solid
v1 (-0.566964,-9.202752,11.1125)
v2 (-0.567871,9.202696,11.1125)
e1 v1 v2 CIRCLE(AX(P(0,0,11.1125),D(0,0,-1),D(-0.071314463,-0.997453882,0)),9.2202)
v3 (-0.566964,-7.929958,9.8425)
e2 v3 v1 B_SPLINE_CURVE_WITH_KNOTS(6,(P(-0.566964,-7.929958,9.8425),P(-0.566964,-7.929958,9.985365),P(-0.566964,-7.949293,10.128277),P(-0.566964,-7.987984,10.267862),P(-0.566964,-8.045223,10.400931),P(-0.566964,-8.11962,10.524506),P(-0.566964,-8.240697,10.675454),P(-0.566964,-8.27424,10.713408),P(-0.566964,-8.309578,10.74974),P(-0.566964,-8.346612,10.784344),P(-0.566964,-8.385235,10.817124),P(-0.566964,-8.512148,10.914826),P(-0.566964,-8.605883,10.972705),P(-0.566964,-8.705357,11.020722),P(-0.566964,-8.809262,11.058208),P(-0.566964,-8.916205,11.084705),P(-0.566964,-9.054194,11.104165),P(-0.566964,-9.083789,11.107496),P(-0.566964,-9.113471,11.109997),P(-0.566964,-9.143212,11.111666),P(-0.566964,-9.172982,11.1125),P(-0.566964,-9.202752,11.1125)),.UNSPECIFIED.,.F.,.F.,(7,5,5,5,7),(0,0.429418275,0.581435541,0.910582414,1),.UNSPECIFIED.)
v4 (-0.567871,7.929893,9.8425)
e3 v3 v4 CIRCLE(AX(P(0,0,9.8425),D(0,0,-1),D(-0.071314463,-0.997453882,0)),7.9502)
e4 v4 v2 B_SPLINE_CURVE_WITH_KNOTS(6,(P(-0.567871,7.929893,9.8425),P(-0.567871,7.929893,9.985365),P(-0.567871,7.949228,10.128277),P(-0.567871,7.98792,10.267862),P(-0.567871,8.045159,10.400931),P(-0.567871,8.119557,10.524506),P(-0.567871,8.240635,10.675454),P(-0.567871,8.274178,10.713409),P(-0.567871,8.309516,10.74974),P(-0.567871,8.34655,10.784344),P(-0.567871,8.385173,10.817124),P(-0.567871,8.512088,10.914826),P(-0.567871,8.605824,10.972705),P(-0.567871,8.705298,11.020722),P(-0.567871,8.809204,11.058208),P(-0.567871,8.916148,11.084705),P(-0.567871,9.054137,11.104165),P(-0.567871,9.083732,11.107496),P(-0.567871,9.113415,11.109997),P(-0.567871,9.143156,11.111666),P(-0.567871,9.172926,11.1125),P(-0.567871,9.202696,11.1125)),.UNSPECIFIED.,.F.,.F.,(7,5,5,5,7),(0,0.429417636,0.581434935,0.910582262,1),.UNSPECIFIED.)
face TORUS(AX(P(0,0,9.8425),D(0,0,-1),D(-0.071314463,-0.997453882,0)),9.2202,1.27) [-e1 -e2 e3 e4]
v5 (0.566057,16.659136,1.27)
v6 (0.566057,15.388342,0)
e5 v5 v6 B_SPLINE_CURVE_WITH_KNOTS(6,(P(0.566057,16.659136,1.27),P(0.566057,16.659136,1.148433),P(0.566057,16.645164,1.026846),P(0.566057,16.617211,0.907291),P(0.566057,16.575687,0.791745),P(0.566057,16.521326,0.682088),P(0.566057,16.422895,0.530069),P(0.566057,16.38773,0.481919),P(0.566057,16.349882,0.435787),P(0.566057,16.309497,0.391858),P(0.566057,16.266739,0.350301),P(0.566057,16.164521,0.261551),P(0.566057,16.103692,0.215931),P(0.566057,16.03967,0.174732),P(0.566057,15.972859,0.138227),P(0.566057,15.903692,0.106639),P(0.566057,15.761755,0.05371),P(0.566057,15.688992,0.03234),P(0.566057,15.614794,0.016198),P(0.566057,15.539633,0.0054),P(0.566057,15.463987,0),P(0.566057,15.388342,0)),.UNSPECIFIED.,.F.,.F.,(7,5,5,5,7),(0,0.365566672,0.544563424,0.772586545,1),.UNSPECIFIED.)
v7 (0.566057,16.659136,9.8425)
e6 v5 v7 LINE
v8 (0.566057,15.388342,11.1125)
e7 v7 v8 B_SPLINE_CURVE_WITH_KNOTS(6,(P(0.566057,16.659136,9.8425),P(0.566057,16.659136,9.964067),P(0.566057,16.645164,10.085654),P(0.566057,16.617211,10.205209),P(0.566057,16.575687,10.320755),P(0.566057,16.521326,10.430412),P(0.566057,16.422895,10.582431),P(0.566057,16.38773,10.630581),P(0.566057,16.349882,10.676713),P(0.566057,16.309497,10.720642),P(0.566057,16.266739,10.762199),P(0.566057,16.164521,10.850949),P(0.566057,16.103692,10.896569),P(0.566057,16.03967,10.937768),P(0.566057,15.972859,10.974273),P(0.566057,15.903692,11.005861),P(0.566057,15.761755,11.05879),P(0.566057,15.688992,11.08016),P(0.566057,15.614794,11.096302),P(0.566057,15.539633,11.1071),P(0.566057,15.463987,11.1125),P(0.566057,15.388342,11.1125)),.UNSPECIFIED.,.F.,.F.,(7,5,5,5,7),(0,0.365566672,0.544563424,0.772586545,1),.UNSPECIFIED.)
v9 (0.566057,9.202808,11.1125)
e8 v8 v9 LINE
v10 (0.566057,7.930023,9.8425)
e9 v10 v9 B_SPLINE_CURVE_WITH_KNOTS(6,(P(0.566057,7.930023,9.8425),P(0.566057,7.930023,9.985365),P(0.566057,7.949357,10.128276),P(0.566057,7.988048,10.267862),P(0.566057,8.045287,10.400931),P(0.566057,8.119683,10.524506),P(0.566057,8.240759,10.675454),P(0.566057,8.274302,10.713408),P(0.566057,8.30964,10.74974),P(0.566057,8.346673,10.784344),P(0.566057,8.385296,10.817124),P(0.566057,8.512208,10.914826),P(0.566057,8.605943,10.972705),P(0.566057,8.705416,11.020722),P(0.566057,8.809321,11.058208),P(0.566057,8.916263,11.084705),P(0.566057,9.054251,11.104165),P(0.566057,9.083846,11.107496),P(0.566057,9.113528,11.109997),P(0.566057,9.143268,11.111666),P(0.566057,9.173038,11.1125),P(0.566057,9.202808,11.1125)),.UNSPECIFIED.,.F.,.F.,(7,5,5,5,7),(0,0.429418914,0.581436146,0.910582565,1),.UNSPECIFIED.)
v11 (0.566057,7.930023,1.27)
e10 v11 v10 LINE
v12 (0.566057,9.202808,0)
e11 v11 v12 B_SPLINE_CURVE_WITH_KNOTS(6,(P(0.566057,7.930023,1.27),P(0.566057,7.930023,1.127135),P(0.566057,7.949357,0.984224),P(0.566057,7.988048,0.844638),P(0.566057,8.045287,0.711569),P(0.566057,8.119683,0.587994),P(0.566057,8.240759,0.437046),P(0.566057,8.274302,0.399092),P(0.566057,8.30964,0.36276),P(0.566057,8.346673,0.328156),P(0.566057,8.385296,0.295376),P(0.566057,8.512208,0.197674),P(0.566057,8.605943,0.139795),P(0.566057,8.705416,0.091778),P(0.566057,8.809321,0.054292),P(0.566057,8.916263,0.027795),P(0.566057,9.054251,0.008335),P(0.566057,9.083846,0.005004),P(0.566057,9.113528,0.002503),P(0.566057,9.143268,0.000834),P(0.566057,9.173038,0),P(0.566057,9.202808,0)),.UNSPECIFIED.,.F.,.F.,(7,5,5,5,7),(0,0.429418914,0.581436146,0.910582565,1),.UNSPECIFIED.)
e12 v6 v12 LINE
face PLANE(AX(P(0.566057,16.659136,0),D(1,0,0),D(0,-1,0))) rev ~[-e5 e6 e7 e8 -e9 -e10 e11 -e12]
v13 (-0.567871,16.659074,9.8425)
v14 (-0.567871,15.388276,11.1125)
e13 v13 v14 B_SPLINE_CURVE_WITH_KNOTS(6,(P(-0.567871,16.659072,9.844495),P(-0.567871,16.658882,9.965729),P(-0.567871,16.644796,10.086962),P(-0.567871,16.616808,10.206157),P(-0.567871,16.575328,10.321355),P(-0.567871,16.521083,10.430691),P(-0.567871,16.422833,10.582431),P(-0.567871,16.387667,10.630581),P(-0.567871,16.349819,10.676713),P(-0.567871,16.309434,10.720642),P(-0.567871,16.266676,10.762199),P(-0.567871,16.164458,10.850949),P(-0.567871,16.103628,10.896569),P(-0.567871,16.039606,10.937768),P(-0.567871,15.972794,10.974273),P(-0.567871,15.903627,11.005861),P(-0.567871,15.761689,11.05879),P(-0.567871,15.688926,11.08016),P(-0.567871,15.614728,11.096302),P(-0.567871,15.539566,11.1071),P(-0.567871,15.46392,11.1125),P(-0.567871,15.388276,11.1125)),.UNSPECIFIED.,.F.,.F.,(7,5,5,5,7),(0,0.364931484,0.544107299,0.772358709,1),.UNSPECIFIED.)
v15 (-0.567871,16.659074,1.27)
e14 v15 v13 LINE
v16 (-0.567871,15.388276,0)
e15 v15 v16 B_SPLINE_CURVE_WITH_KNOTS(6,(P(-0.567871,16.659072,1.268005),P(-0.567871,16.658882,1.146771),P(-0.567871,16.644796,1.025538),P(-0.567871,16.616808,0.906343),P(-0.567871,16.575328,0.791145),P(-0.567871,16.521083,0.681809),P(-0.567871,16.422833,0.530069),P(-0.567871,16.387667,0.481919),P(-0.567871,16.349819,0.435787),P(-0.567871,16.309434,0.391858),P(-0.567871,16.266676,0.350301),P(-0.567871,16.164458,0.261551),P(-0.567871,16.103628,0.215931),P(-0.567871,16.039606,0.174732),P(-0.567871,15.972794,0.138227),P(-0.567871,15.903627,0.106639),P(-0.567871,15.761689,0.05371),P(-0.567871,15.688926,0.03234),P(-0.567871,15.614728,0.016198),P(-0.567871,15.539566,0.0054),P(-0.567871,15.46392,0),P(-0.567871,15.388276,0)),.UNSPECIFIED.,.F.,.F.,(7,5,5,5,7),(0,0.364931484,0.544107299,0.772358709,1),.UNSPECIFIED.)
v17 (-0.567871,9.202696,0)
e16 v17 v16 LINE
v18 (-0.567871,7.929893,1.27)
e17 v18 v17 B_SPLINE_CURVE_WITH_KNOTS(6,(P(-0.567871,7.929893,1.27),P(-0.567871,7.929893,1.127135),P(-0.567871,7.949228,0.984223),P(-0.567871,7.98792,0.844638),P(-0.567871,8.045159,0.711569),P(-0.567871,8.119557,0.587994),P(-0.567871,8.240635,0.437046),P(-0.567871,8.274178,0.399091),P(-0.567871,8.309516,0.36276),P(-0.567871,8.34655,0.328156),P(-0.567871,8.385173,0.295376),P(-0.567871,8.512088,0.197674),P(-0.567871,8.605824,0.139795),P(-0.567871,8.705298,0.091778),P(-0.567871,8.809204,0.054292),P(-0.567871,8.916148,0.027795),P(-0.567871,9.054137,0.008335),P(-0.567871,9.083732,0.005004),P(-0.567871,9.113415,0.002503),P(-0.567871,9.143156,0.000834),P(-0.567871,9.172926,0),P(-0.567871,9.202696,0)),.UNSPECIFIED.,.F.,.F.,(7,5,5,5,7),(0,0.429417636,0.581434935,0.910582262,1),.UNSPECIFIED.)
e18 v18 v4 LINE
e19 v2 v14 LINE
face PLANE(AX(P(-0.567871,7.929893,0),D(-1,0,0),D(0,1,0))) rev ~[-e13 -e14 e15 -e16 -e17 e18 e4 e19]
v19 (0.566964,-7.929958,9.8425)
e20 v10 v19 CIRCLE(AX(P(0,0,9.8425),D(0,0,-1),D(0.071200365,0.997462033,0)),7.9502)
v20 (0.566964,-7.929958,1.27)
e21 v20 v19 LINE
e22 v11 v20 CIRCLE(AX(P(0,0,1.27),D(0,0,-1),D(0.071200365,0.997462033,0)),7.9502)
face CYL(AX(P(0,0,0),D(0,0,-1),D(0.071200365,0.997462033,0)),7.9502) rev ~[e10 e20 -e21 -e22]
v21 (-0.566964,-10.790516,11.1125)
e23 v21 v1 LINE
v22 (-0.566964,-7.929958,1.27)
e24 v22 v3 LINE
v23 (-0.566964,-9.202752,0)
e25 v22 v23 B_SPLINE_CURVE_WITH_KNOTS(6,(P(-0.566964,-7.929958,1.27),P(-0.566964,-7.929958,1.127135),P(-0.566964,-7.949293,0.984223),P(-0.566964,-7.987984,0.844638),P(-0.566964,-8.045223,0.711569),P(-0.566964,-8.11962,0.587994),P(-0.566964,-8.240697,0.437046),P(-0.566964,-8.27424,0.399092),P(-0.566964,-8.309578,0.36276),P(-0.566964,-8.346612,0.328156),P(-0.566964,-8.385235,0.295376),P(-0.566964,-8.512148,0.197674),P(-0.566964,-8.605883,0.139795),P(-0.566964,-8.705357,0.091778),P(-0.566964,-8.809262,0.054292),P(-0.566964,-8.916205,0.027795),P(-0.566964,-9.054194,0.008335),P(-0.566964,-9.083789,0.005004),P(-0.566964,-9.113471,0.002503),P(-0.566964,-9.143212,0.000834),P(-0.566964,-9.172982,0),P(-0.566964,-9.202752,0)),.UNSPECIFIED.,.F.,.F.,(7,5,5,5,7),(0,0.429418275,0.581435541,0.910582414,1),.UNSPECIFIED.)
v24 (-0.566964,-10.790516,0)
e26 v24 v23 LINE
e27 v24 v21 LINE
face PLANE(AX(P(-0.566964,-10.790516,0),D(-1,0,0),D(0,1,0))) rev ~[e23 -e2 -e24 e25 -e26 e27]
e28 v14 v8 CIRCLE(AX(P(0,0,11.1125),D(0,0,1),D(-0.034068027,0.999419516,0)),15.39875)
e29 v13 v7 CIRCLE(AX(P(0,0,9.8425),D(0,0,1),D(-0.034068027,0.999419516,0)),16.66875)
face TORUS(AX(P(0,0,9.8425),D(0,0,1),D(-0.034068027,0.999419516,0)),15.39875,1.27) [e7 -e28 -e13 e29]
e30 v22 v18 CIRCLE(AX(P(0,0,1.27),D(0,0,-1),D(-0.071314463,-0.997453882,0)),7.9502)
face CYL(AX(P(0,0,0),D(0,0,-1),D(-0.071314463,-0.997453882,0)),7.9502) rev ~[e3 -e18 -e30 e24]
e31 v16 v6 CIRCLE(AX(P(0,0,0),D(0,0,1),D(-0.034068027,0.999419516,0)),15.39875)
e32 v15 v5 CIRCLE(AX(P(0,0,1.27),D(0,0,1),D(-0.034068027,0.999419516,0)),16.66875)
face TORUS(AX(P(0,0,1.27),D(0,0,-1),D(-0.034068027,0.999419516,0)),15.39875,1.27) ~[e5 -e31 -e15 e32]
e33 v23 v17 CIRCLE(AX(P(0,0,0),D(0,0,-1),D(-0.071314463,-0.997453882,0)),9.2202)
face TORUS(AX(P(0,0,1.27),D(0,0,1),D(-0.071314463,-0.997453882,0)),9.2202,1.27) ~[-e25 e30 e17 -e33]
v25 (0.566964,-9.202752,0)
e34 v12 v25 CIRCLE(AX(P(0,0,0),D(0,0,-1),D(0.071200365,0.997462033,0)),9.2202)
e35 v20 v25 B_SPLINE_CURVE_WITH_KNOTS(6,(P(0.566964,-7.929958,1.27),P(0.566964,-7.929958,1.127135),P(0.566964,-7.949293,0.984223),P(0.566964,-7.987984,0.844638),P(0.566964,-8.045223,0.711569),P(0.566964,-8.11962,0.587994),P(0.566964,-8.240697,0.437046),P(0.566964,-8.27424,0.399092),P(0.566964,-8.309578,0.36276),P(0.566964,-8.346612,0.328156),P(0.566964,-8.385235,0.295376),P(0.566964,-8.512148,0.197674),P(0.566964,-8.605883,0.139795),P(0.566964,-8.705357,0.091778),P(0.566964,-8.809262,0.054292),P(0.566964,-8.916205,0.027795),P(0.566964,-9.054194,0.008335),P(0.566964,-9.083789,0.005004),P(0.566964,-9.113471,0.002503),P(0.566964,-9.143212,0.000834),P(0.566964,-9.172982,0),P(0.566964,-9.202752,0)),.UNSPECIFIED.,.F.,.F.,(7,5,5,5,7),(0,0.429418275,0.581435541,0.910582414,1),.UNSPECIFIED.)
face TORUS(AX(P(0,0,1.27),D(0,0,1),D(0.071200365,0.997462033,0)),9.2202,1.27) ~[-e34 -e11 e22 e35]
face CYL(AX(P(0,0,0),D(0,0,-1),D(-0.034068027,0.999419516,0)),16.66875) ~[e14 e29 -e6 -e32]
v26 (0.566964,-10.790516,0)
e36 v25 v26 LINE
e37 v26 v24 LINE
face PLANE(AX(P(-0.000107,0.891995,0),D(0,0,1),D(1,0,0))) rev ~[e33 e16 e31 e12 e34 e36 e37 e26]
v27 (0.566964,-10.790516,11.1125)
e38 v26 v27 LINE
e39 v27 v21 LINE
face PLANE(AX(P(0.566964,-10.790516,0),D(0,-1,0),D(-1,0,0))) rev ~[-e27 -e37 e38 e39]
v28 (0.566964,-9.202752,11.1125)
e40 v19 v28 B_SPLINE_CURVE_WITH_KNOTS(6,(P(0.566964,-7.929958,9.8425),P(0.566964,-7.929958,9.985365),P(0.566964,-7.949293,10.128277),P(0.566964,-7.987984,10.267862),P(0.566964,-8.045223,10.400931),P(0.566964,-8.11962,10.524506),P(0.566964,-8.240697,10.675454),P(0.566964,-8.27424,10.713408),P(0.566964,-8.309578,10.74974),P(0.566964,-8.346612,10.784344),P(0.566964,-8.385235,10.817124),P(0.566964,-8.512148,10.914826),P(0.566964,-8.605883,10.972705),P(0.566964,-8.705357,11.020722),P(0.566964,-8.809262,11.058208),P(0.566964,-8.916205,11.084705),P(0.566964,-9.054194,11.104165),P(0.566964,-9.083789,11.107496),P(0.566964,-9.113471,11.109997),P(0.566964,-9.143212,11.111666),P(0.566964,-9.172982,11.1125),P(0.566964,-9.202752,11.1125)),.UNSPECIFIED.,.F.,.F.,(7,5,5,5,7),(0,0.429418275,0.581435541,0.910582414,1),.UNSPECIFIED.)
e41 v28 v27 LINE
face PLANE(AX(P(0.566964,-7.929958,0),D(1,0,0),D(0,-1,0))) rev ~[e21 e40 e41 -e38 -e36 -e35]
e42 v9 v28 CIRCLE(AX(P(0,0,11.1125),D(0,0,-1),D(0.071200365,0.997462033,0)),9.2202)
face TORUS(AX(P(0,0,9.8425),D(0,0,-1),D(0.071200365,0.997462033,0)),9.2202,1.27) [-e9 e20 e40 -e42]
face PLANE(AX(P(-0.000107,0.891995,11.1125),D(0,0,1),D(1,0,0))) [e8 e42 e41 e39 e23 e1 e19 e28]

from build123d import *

# Parameters (mm, degrees)
F1_DEPTH = 11.1125
F2_R     = 1.27


# Not quite as in the source:
# - a feature names something its author has since deleted; it is built from what else it names


with BuildPart() as f1:
    # F0 (on Top) → F1 (new body)
    with BuildSketch(Plane.XY):
        with BuildLine():
            Line((0.5669642458, -7.9299578551), (0.5669642458, -10.7905164226))
            Line((0.5669642458, -10.7905164226), (-0.5669642458, -10.7905164226))
            Line((-0.5669642458, -10.7905164226), (-0.5669642458, -7.9299578551))
            ThreePointArc((-0.5669642458, -7.9299578551), (-7.950199987, -0.0004547511), (-0.5678714286, 7.9298929426))
            Line((-0.5678714286, 7.9298929426), (-0.5678714286, 16.659074062))
            ThreePointArc((-0.5678714286, 16.659074062), (0.0009076686, -16.6687499753), (0.5660571417, 16.6591358082))
            Line((0.5660571417, 16.6591358082), (0.5660571417, 7.9300226577))
            ThreePointArc((0.5660571417, 7.9300226577), (7.950199987, 0.0004547079), (0.5669642458, -7.9299578551))
        make_face()
    extrude(amount=F1_DEPTH)

    # F2
    f2_edges = [f1.edges().sort_by_distance(p)[0] for p in [
        (-7.9502, -0.000455, 11.1125),
        (-7.9502, -0.000455, 0),
        (0.000908, -16.66875, 11.1125),
        (0.000908, -16.66875, 0),
        (7.9502, 0.000455, 11.1125),
        (7.9502, 0.000455, 0),
    ]]
    fillet(f2_edges, radius=F2_R)


solid = f1.part
